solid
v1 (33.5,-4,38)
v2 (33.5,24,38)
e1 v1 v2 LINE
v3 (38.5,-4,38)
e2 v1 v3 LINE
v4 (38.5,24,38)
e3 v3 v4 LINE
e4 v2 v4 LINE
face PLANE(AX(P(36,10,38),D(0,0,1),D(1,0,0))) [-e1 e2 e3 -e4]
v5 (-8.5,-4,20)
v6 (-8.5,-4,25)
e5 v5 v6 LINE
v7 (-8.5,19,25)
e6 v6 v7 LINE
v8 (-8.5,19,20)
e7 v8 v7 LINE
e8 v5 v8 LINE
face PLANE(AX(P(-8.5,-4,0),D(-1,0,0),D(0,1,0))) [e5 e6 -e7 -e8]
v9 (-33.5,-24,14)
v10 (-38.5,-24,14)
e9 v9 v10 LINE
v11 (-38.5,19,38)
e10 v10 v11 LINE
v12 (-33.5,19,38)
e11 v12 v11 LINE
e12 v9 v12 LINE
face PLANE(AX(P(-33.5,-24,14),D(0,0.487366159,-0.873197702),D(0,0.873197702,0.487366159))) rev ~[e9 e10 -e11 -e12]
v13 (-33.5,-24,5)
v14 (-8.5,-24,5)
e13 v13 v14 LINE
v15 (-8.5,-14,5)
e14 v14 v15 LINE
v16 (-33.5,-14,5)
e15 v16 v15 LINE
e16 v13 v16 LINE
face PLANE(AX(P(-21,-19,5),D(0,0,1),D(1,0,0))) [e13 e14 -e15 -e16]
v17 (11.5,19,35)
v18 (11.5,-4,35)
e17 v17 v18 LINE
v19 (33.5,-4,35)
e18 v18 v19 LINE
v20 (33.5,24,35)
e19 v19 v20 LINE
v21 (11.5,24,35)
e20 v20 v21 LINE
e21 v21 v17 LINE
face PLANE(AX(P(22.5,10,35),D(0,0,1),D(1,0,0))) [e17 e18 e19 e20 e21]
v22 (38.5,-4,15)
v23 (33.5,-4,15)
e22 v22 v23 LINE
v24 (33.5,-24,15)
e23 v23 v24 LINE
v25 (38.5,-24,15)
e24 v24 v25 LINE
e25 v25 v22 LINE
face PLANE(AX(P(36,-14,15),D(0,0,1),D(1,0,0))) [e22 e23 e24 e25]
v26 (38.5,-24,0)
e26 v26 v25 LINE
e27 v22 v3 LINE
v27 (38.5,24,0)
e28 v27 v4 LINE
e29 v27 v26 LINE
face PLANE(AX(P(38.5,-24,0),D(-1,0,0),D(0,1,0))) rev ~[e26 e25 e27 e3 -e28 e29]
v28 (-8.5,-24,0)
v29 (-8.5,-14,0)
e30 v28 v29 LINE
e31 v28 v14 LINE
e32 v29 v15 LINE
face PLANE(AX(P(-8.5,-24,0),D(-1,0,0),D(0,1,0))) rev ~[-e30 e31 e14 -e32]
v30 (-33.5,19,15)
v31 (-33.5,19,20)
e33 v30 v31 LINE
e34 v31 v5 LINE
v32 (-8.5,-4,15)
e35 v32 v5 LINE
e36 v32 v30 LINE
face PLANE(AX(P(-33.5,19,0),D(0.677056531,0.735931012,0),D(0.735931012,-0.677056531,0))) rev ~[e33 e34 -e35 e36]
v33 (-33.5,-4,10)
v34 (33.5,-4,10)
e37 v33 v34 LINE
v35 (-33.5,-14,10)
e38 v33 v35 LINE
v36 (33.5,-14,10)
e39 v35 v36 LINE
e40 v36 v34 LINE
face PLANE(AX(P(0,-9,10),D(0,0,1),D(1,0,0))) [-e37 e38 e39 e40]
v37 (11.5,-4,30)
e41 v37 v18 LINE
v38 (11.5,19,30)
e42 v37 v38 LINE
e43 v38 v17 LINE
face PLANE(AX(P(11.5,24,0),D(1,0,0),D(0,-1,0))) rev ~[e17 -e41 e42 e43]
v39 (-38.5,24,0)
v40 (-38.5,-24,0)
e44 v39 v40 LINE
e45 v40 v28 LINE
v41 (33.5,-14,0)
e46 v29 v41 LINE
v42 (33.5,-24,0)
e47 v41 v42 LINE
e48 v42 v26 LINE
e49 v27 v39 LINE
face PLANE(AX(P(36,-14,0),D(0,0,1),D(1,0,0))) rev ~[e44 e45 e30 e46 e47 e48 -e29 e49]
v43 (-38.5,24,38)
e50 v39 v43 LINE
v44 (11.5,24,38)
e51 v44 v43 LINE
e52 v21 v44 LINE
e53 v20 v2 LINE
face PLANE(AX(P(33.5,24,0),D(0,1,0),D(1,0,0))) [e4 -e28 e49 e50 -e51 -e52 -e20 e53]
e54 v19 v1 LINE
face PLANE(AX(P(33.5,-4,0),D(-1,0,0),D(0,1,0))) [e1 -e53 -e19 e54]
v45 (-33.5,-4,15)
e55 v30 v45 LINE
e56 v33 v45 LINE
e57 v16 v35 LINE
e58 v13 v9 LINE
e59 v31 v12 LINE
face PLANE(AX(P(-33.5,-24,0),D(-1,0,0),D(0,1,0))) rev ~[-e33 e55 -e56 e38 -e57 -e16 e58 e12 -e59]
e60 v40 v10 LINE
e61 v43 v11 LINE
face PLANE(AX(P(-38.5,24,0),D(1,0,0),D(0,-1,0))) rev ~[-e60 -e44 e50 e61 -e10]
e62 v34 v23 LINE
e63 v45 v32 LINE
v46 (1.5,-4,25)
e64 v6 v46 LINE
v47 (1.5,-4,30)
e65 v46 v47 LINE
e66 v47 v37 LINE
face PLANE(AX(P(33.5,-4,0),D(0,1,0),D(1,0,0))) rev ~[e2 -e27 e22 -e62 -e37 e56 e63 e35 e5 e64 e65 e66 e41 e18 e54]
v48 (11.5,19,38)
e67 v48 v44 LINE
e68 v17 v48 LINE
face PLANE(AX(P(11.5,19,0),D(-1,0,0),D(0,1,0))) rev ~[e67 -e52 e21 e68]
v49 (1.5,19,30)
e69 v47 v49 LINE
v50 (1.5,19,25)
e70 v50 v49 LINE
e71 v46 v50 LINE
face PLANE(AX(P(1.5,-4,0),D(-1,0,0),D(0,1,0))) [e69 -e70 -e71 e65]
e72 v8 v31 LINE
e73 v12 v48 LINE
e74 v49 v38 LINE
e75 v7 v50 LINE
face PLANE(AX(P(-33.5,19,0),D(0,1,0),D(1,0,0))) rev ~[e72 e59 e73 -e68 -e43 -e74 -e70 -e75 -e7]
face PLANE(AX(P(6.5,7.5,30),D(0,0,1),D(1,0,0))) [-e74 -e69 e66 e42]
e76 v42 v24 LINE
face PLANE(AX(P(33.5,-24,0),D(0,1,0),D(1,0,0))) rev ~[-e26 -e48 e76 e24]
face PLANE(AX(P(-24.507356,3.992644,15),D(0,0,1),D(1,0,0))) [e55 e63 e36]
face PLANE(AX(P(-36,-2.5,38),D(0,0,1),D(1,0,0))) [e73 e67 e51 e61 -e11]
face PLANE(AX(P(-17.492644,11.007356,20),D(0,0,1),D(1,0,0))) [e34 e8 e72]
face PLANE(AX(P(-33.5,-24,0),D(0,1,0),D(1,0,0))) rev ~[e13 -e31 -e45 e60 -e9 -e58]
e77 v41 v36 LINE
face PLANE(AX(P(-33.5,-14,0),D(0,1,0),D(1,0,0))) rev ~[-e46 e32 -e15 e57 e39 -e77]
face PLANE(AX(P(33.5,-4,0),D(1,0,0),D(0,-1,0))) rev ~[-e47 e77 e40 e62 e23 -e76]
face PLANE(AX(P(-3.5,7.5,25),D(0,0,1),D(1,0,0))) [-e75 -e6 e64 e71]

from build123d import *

# Parameters (mm, degrees)
F1_DEPTH  = 38
F0_W      = 25
F0_H      = 10
F3_DEPTH  = 5
F4_DEPTH  = 10
F5_DEPTH  = 15
F6_DEPTH  = 20
F7_DEPTH  = 25
F0_W_2    = 10
F0_H_2    = 23
F8_DEPTH  = 25
F9_DEPTH  = 30
F10_DEPTH = 35
F0_W_3    = 5
F0_H_3    = 28
F11_DEPTH = 38
F12_DEPTH = 15


# Not quite as in the source:
# - a feature names something its author has since deleted; it is built from what else it names


with BuildPart() as f1:
    # F0 (on Top) → F1 (new body)
    with BuildSketch(Plane.XY):
        Polygon((-33.5, 19), (-38.5, 19), (-38.5, -24), (-33.5, -24), (-33.5, -14), (-33.5, -4), align=None)
        Polygon((11.5, 24), (-38.5, 24), (-38.5, 19), (-33.5, 19), (-8.5, 19), (1.5, 19), (11.5, 19), align=None)
    extrude(amount=F1_DEPTH)

    # F0 (on Top) → F3 (join)
    with BuildSketch(Plane.XY):
        with Locations((-21, -19)):
            Rectangle(F0_W, F0_H)
    extrude(amount=F3_DEPTH)

    # F0 (on Top) → F4 (join)
    with BuildSketch(Plane.XY):
        Polygon((33.5, -14), (33.5, -4), (11.5, -4), (1.5, -4), (-8.5, -4), (-33.5, -4), (-33.5, -14), (-8.5, -14), align=None)
    extrude(amount=F4_DEPTH)

    # F0 (on Top) → F5 (join)
    with BuildSketch(Plane.XY):
        Polygon((-8.5, -4), (-33.5, 19), (-33.5, -4), align=None)
    extrude(amount=F5_DEPTH)

    # F0 (on Top) → F6 (join)
    with BuildSketch(Plane.XY):
        Polygon((-8.5, 19), (-33.5, 19), (-8.5, -4), align=None)
    extrude(amount=F6_DEPTH)

    # F2 (on face) → F7 (cut)
    with BuildSketch(Plane.YZ.offset(-33.5)):
        Polygon((-24, 14), (19, 38), (-24, 38), align=None)
    extrude(amount=-F7_DEPTH, mode=Mode.SUBTRACT)

    # F0 (on Top) → F8 (join)
    with BuildSketch(Plane.XY):
        with Locations((-3.5, 7.5)):
            Rectangle(F0_W_2, F0_H_2)
    extrude(amount=F8_DEPTH)

    # F0 (on Top) → F9 (join)
    with BuildSketch(Plane.XY):
        with Locations((6.5, 7.5)):
            Rectangle(F0_W_2, F0_H_2)
    extrude(amount=F9_DEPTH)

    # F0 (on Top) → F10 (join)
    with BuildSketch(Plane.XY):
        Polygon((33.5, 24), (11.5, 24), (11.5, 19), (11.5, -4), (33.5, -4), align=None)
    extrude(amount=F10_DEPTH)

    # F0 (on Top) → F11 (join)
    with BuildSketch(Plane.XY):
        with Locations((36, 10)):
            Rectangle(F0_W_3, F0_H_3)
    extrude(amount=F11_DEPTH)

    # F0 (on Top) → F12 (join)
    with BuildSketch(Plane.XY):
        Polygon((38.5, -4), (33.5, -4), (33.5, -14), (33.5, -24), (38.5, -24), align=None)
    extrude(amount=F12_DEPTH)


solid = f1.part
